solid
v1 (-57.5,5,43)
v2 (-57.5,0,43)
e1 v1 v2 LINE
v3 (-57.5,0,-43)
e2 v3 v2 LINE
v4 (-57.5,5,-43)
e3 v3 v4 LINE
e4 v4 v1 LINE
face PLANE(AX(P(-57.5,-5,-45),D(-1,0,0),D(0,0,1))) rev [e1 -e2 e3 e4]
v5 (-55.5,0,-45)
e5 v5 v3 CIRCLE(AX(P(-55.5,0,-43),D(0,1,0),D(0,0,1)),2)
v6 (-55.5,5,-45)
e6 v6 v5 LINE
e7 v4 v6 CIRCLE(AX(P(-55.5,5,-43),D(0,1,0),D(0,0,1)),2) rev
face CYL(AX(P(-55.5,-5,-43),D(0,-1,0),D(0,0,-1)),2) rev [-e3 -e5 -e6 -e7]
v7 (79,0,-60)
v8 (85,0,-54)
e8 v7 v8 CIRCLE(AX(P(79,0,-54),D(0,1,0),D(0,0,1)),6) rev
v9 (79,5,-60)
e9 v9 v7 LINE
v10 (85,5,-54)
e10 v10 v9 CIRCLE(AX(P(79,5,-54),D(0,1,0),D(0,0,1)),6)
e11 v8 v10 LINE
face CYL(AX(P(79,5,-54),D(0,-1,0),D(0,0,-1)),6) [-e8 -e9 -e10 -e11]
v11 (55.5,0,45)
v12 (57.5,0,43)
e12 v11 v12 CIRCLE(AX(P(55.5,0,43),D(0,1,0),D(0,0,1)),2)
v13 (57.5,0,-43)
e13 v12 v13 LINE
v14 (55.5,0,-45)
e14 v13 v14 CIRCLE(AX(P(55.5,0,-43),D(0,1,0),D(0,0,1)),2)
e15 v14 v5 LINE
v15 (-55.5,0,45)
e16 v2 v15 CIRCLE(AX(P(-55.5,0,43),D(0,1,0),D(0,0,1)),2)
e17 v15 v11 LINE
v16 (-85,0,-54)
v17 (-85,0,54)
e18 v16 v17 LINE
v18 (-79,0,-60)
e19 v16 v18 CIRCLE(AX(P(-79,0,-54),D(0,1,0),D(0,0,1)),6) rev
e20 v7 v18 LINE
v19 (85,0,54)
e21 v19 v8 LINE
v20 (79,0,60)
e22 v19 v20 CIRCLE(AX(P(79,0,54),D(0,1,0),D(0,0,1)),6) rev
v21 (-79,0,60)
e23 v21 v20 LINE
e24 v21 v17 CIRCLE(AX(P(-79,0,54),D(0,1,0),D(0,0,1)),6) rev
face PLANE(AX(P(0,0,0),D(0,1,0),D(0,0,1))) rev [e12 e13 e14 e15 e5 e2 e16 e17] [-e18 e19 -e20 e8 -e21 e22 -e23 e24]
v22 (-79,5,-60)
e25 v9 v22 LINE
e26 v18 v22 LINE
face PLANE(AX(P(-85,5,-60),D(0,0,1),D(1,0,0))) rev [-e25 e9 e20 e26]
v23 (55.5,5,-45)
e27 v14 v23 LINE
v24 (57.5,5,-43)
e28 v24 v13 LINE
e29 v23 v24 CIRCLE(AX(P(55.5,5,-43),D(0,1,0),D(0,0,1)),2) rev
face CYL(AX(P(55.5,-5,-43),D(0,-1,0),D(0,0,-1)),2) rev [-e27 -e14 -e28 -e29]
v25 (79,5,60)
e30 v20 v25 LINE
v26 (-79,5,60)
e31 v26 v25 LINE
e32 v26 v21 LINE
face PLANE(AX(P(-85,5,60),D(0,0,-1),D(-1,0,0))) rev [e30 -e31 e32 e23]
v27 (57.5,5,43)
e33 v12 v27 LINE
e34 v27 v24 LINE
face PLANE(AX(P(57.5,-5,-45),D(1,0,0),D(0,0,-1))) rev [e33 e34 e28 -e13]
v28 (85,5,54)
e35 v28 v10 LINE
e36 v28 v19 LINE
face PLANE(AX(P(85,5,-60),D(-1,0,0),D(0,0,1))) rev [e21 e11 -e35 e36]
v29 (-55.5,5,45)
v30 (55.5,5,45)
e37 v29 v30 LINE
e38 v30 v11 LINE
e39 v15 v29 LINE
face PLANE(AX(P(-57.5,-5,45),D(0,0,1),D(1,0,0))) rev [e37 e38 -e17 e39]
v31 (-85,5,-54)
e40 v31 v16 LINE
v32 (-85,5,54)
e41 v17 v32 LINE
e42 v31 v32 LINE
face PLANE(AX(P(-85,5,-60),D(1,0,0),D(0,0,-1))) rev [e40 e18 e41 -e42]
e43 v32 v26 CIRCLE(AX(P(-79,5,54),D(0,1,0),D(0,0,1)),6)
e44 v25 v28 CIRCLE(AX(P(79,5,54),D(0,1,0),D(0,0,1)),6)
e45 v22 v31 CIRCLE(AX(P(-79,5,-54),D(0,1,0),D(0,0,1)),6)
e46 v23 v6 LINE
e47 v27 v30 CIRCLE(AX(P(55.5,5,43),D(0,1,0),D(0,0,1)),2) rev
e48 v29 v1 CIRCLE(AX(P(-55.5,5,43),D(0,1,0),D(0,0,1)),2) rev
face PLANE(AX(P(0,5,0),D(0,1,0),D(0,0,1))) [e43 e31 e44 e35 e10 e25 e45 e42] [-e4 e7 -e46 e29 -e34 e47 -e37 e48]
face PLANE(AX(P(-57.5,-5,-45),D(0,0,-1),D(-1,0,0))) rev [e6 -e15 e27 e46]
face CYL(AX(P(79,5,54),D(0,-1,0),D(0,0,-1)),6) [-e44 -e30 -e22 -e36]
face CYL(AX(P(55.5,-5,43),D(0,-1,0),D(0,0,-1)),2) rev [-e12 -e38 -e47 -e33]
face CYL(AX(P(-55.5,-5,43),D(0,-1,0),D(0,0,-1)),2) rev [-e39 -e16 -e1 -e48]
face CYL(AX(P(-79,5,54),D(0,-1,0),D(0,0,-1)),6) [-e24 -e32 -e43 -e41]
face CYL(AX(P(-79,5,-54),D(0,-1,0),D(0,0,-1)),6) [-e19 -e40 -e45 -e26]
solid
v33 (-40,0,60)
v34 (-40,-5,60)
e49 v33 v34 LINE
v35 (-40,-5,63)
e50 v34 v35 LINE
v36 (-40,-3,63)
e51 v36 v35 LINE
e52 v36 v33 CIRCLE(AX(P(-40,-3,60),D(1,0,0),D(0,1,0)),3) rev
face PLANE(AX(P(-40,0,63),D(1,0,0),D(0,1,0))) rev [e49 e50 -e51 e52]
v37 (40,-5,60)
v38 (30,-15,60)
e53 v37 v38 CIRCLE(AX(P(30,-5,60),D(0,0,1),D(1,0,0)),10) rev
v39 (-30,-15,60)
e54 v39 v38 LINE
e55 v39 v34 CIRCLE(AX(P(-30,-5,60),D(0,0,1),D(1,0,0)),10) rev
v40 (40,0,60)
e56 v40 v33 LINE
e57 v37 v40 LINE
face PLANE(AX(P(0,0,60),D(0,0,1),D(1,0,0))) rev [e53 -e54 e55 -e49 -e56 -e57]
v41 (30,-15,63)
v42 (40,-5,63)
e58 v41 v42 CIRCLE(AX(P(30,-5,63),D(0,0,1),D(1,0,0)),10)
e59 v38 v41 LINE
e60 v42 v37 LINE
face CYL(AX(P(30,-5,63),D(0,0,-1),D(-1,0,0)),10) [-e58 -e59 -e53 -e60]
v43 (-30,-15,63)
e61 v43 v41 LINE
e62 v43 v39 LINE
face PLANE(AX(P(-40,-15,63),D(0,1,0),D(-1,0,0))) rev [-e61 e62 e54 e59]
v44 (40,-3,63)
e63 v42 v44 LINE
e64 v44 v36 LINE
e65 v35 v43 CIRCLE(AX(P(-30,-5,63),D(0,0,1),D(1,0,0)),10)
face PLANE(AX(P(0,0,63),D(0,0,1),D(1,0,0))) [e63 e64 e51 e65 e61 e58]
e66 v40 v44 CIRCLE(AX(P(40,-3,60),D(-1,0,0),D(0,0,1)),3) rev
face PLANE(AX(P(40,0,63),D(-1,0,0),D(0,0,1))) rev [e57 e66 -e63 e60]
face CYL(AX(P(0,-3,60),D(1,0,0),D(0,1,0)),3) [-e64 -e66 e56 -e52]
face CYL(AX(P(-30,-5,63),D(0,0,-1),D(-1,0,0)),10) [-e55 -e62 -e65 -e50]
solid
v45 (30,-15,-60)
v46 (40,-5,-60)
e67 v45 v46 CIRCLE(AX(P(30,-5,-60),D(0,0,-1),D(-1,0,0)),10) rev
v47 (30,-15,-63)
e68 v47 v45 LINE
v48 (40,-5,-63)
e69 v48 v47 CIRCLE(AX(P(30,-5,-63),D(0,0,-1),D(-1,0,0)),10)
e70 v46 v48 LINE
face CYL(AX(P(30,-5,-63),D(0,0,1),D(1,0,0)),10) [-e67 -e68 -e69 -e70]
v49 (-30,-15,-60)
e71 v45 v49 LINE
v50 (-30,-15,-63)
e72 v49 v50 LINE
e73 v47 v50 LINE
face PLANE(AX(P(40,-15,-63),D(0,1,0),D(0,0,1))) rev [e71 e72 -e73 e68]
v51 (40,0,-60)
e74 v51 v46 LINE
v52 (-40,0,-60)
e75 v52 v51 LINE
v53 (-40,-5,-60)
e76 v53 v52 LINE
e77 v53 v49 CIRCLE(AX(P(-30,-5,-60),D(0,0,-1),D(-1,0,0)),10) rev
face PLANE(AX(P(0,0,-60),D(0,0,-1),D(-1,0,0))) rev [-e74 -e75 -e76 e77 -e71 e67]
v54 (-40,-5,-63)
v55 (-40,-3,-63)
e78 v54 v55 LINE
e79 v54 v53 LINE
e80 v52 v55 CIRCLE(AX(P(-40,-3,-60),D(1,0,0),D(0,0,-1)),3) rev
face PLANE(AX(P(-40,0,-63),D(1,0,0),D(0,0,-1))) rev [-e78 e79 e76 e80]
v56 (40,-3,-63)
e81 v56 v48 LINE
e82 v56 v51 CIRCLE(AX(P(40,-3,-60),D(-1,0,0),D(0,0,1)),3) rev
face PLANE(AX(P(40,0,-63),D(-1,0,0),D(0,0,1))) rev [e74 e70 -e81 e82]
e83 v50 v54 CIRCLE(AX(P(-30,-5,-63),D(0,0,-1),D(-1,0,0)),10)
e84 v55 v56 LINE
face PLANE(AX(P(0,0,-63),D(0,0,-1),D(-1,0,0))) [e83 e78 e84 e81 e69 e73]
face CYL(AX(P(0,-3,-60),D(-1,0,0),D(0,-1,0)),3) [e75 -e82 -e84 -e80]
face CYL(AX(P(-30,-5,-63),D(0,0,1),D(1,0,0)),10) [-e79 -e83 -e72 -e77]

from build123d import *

# Parameters (mm, degrees)
SKETCH1_W           = 170
SKETCH1_H           = 120
BOSS_EXTRUDE1_DEPTH = 5
FILLET1_R           = 6
SKETCH2_W           = 115
SKETCH2_H           = 90
CUT_EXTRUDE1_DEPTH  = 10
FILLET2_R           = 2
SKETCH3_W           = 80
SKETCH3_H           = 15
BOSS_EXTRUDE2_DEPTH = 3
FILLET3_R           = 10
FILLET4_R           = 3
SKETCH4_W           = 80
SKETCH4_H           = 15
BOSS_EXTRUDE3_DEPTH = 3
FILLET5_R           = 3
FILLET6_R           = 10


with BuildPart() as part:
    # Sketch1 → Boss-Extrude1 (new body)
    with BuildSketch(Plane(origin=(0, 0, 0), x_dir=(1, 0, 0), z_dir=(0, 1, 0))):
        Rectangle(SKETCH1_W, SKETCH1_H)
    extrude(amount=BOSS_EXTRUDE1_DEPTH)

    # Fillet1
    fillet1_edges = [part.edges().sort_by_distance(p)[0] for p in [
        (85, 2.5, 60),
        (-85, 2.5, 60),
        (-85, 2.5, -60),
        (85, 2.5, -60),
    ]]
    fillet(fillet1_edges, radius=FILLET1_R)

    # Sketch2 → Cut-Extrude1 (cut)
    with BuildSketch(Plane(origin=(0, 5, 0), x_dir=(1, 0, 0), z_dir=(0, 1, 0))):
        Rectangle(SKETCH2_W, SKETCH2_H)
    extrude(amount=-CUT_EXTRUDE1_DEPTH, mode=Mode.SUBTRACT)

    # Fillet2
    fillet2_edges = [part.edges().sort_by_distance(p)[0] for p in [
        (57.5, 2.5, -45),
        (57.5, 2.5, 45),
        (-57.5, 2.5, 45),
        (-57.5, 2.5, -45),
    ]]
    fillet(fillet2_edges, radius=FILLET2_R)


with BuildPart() as body_2:
    # Sketch3 → Boss-Extrude2 (new body)
    with BuildSketch(Plane.XY.offset(60)):
        with Locations((0, -7.5)):
            Rectangle(SKETCH3_W, SKETCH3_H)
    extrude(amount=BOSS_EXTRUDE2_DEPTH)

    # Fillet3
    fillet3_edges = [body_2.edges().sort_by_distance(p)[0] for p in [
        (40, -15, 61.5),
        (-40, -15, 61.5),
    ]]
    fillet(fillet3_edges, radius=FILLET3_R)

    # Fillet4
    fillet4_edges = [body_2.edges().sort_by_distance(p)[0] for p in [
        (0, 0, 63),
    ]]
    fillet(fillet4_edges, radius=FILLET4_R - 0.0001)  # a hair under: the kernel refuses the full size


with BuildPart() as body_3:
    # Sketch4 → Boss-Extrude3 (new body)
    with BuildSketch(Plane(origin=(0, 0, -60), x_dir=(-1, 0, 0), z_dir=(0, 0, -1))):
        with Locations((0, -7.5)):
            Rectangle(SKETCH4_W, SKETCH4_H)
    extrude(amount=BOSS_EXTRUDE3_DEPTH)

    # Fillet5
    fillet5_edges = [body_3.edges().sort_by_distance(p)[0] for p in [
        (0, 0, -63),
    ]]
    fillet(fillet5_edges, radius=FILLET5_R - 0.0001)  # a hair under: the kernel refuses the full size

    # Fillet6
    fillet6_edges = [body_3.edges().sort_by_distance(p)[0] for p in [
        (-40, -15, -61.5),
        (40, -15, -61.5),
    ]]
    fillet(fillet6_edges, radius=FILLET6_R)


solid = Compound([part.part, body_2.part, body_3.part])
